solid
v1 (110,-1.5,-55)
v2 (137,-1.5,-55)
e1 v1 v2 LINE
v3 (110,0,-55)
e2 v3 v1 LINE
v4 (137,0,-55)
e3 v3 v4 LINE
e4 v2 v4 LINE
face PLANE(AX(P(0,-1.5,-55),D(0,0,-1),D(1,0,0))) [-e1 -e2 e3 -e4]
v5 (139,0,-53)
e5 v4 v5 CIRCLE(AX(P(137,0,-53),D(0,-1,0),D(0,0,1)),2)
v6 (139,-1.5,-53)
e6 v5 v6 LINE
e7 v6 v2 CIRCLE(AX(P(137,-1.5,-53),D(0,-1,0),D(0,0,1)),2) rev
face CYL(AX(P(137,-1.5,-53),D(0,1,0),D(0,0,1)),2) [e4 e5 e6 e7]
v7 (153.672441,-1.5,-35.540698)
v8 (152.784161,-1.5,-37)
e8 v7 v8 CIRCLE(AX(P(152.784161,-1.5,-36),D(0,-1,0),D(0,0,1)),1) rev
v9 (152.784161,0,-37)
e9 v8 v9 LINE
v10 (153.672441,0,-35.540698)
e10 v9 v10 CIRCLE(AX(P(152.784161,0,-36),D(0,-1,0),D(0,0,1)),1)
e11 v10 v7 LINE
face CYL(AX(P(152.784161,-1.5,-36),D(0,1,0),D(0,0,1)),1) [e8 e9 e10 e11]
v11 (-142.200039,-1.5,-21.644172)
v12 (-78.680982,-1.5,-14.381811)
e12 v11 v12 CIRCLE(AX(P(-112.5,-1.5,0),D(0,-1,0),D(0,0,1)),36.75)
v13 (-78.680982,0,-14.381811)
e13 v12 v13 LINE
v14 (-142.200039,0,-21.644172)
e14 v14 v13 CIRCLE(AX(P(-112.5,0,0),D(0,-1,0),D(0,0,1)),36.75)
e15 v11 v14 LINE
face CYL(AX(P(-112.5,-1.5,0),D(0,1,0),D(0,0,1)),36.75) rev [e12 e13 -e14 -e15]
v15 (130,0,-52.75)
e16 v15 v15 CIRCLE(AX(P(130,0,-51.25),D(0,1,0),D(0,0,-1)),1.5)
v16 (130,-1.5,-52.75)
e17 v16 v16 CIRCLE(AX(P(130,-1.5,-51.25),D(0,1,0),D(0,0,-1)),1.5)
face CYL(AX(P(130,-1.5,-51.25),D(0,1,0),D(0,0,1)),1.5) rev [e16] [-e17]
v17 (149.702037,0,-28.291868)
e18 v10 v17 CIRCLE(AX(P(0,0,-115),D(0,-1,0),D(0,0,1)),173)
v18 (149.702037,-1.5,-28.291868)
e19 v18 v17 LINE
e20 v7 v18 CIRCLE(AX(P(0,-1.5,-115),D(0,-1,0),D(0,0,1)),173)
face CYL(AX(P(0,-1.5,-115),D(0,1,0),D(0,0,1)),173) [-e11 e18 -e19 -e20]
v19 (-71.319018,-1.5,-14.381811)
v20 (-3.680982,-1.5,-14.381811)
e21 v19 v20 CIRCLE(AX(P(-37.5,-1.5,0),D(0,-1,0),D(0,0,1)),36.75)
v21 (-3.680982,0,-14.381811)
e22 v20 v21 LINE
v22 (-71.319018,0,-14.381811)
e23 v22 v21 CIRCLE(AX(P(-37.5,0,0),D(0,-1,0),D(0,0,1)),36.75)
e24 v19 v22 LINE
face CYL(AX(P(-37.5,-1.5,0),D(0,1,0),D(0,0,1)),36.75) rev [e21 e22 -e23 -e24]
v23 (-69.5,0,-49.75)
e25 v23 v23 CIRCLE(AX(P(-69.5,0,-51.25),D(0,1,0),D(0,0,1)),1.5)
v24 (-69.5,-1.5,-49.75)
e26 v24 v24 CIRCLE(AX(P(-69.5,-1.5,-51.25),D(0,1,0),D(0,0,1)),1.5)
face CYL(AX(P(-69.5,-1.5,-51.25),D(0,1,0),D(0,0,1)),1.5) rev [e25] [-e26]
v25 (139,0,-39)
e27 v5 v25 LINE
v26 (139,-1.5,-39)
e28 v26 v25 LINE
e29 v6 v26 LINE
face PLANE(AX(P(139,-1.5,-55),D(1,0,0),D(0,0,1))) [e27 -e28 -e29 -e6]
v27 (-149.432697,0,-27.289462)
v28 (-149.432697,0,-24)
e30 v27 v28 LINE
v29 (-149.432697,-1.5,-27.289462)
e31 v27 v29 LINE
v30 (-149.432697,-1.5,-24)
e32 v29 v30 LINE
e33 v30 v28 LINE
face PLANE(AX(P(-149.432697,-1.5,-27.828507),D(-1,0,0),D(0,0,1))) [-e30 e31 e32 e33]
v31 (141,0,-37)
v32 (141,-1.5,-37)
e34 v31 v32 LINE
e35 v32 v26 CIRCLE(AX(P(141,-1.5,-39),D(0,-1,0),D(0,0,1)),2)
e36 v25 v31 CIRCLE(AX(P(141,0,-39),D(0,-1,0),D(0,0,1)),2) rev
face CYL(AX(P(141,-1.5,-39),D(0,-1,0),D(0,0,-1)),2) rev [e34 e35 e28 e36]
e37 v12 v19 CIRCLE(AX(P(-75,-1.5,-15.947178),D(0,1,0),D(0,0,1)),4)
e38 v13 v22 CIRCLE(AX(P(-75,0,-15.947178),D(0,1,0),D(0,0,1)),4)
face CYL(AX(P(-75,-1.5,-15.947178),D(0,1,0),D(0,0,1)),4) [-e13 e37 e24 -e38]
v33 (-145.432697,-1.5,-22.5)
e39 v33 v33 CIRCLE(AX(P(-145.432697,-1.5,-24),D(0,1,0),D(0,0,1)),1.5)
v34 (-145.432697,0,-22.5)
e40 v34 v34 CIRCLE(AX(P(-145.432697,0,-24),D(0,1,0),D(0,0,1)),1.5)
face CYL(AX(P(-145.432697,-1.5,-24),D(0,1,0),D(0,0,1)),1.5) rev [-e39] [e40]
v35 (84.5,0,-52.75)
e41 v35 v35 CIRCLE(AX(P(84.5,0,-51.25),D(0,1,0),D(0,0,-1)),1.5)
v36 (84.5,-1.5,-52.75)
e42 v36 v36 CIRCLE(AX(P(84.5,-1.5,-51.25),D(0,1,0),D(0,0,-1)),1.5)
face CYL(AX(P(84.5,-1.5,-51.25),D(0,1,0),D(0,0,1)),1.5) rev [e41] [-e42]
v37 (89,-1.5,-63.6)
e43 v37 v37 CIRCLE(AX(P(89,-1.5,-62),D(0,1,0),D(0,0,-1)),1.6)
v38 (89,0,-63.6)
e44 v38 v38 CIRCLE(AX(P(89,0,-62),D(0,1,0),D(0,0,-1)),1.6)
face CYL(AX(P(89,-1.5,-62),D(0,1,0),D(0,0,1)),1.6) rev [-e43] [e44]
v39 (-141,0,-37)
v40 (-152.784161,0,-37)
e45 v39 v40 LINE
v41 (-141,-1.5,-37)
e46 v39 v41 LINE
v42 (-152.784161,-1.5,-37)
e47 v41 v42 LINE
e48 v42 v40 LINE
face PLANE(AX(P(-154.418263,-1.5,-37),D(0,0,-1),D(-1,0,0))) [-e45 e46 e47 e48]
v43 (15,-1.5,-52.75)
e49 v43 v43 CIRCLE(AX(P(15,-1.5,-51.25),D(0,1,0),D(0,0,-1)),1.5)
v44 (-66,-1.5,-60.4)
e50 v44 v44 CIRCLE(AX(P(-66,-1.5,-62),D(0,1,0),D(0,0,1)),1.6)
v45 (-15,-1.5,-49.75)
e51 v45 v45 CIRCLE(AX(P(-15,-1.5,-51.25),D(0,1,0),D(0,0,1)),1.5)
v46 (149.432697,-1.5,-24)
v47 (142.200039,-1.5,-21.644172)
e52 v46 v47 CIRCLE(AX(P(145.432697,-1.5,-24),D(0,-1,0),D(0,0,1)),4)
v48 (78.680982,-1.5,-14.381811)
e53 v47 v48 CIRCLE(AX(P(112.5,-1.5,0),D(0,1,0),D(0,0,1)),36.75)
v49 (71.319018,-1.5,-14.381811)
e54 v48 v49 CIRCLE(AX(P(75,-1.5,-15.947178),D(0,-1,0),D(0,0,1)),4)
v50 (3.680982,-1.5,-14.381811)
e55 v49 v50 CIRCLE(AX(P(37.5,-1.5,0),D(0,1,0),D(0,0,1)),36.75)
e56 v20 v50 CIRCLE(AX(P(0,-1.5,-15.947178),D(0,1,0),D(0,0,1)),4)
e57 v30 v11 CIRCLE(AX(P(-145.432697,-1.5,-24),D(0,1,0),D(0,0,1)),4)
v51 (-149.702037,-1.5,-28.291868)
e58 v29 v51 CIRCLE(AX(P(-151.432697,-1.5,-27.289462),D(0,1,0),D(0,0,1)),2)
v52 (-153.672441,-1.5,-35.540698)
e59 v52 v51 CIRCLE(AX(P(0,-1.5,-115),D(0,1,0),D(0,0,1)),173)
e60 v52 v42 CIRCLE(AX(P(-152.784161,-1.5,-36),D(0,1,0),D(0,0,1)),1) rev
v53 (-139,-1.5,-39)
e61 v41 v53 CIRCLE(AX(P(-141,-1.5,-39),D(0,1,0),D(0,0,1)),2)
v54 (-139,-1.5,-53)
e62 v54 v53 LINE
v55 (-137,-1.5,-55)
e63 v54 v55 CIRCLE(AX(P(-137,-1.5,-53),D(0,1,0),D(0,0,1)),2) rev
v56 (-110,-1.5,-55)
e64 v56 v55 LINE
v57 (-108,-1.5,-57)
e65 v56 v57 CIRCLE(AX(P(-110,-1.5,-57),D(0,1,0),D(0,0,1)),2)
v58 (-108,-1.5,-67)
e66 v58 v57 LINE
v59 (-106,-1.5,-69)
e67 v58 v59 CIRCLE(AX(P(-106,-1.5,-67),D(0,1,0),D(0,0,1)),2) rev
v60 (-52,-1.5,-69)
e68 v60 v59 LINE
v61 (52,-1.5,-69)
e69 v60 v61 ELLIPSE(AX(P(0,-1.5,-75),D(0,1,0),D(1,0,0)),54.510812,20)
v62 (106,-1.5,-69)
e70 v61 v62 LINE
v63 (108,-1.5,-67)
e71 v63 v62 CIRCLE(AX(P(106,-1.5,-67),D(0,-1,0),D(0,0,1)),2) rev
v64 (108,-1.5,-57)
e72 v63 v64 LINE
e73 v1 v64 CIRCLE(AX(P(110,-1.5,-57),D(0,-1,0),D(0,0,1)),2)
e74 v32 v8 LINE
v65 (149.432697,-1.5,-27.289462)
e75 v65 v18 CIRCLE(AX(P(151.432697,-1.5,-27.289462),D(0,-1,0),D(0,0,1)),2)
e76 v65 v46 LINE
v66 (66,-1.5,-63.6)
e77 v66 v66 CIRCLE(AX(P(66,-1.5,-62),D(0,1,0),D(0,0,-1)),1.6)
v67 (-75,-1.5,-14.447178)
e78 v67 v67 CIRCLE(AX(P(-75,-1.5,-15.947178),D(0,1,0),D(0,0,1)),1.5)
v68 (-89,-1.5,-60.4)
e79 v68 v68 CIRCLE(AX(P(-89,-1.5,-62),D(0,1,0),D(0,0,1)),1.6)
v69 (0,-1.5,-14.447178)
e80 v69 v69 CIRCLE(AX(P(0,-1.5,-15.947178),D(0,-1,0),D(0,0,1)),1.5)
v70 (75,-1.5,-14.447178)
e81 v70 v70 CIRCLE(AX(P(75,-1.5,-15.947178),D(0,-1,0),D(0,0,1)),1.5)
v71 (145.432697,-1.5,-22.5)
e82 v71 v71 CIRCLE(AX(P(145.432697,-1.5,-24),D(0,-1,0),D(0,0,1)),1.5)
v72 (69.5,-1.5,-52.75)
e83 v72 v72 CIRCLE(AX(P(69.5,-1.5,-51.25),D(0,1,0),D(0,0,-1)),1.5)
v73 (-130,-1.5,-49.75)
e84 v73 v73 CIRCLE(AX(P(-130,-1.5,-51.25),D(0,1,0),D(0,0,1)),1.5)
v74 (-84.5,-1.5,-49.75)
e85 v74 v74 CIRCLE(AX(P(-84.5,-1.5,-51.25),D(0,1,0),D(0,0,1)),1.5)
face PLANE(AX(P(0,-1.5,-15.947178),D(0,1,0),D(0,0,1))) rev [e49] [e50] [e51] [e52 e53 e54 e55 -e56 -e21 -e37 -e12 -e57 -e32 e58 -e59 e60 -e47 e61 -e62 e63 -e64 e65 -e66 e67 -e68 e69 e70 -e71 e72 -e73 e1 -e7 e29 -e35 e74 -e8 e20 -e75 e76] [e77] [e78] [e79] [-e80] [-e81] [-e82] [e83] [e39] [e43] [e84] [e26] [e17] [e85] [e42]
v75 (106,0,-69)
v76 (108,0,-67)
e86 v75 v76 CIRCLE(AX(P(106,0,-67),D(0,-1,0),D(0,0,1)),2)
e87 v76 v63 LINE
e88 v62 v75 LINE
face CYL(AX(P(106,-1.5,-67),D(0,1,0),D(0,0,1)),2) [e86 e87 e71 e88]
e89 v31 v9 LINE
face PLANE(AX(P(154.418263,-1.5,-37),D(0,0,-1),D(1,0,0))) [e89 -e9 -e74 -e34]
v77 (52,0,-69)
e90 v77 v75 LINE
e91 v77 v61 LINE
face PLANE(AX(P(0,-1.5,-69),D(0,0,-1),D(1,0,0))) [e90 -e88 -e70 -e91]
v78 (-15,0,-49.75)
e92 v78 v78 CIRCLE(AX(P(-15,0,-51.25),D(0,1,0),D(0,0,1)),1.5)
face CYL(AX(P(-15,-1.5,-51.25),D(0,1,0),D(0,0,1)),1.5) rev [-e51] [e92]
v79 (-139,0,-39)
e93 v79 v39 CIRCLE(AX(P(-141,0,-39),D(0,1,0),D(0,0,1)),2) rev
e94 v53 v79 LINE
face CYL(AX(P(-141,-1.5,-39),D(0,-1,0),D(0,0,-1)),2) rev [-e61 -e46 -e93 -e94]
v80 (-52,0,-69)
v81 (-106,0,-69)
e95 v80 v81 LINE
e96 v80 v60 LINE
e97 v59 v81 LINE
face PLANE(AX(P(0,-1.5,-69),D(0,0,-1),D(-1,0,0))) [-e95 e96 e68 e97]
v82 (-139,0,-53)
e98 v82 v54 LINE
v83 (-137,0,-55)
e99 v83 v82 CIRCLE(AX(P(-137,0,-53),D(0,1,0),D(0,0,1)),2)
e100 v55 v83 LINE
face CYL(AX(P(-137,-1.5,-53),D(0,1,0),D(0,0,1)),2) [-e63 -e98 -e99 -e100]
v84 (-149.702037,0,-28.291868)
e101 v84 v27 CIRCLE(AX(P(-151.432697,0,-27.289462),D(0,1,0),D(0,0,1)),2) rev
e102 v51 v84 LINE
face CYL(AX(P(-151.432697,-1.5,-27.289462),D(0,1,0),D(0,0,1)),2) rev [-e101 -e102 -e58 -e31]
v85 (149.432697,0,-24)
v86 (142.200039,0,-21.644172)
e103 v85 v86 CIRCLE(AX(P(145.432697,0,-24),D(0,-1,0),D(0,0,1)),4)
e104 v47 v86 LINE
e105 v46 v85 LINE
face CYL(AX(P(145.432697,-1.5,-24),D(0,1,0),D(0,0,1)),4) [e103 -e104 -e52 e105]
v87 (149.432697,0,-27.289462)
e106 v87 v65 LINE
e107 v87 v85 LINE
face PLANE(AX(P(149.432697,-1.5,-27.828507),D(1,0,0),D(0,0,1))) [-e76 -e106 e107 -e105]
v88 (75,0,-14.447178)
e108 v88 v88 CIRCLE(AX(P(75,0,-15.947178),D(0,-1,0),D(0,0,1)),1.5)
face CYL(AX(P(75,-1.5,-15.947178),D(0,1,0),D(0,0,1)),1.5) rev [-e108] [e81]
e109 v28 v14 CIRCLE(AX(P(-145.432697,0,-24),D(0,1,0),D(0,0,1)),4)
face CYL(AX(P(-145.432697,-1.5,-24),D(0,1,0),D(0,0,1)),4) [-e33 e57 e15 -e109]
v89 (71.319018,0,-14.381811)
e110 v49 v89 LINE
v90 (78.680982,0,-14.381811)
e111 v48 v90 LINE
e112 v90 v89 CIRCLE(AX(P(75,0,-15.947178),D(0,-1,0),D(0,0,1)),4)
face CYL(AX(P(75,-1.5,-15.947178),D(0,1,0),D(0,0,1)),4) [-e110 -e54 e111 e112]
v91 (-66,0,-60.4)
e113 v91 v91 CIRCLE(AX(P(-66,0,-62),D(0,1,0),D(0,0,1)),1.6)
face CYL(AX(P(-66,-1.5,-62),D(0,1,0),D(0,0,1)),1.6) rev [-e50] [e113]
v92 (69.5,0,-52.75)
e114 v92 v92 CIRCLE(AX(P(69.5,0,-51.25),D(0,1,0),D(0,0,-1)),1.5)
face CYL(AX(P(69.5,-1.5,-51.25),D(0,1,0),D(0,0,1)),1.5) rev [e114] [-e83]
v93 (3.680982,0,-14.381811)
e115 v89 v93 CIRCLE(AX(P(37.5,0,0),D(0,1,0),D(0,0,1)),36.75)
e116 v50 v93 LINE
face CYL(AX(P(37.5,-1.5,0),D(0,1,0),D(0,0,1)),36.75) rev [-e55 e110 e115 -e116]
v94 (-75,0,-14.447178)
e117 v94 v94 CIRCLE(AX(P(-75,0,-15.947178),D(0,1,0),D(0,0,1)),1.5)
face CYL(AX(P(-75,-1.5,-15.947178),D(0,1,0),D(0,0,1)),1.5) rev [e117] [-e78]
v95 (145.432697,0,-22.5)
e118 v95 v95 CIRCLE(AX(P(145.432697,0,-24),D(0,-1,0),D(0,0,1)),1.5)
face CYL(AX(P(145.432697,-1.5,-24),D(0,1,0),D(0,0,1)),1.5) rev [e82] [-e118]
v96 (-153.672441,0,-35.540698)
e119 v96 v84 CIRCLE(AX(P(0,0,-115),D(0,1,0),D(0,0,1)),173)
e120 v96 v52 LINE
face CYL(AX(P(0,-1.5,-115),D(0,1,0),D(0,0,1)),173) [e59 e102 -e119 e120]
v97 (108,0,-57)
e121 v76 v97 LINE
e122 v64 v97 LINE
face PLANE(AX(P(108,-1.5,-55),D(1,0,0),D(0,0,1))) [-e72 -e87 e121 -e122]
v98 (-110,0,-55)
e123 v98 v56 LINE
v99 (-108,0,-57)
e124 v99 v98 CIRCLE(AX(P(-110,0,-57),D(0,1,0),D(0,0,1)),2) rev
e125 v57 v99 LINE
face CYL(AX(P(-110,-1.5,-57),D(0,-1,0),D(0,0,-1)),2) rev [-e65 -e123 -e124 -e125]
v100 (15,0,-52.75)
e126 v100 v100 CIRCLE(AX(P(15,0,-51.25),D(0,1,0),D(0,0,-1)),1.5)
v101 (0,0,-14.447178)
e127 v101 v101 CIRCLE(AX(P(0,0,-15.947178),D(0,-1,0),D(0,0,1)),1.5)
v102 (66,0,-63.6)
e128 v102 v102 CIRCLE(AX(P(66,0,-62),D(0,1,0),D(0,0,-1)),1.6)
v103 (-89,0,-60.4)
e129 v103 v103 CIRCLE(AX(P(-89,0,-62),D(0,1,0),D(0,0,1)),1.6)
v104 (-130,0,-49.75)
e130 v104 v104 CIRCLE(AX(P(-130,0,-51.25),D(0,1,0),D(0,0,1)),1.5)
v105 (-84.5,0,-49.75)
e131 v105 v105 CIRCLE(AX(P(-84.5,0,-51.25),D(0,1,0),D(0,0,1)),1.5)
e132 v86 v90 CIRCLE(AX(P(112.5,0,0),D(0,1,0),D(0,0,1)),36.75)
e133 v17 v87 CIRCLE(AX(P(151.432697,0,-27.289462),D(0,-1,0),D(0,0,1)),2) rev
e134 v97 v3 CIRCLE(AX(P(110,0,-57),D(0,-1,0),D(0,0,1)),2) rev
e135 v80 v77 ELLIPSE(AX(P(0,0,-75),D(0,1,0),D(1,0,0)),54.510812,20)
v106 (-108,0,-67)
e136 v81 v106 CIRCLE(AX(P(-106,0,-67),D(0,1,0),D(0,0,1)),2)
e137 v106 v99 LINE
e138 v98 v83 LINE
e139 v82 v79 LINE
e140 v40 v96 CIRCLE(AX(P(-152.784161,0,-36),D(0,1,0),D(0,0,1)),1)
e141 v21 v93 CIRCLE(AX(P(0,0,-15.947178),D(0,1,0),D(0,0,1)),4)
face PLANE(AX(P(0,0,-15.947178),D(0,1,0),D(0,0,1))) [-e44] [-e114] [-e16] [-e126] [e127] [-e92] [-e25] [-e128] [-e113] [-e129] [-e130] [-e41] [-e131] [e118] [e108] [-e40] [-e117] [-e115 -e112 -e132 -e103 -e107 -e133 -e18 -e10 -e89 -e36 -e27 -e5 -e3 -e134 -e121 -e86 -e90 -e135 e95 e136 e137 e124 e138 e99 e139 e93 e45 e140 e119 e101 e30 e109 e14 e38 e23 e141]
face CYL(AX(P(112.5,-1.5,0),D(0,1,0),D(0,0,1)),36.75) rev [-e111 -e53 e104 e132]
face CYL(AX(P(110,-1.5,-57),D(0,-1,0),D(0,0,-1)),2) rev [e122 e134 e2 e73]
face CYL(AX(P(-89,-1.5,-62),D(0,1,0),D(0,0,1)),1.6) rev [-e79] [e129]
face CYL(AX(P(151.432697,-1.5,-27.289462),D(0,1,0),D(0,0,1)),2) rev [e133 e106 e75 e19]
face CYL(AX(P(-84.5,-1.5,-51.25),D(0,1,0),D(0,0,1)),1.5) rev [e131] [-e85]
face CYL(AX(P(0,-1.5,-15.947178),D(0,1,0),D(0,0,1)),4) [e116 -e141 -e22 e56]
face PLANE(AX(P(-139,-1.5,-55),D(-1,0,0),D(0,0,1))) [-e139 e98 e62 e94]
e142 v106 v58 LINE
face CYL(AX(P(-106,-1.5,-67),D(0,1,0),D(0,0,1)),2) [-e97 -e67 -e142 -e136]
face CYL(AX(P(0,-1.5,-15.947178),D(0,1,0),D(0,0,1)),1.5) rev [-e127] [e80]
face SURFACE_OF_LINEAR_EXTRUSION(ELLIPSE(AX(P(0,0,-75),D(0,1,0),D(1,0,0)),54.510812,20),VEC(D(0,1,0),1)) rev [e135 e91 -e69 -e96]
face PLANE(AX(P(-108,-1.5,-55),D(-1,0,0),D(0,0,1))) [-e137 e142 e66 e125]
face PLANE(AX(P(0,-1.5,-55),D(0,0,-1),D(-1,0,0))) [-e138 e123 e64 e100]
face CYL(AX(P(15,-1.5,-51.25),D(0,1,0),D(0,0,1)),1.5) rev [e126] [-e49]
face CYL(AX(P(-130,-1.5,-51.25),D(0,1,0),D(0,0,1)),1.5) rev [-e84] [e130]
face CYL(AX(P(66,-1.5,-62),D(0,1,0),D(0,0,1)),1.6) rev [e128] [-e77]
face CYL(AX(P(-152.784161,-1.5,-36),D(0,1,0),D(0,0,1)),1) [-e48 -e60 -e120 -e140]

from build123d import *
from build123d.topology import SkipClean

# Parameters (mm, degrees)
ESQUISSE1_R               = 1.5
T_LE_DE_BASE_PLI_E1_DEPTH = 1.5
CONG_1_R                  = 2
CONG_2_R                  = 1
ESQUISSE2_W               = 108
ESQUISSE2_H               = 14
PATTE1_DEPTH              = 1.5
CONG_3_R                  = 2
ENL_V_MAT_EXTRU_1_DEPTH   = 1.5
ESQUISSE6_R               = 1.5
ENL_V_MAT_EXTRU_2_DEPTH   = 1.5
ESQUISSE7_R               = 1.6
ENL_V_MAT_EXTRU_3_DEPTH   = 1.5


# Sheet-metal steps are written as plain solids
with BuildPart() as part:
    # Esquisse1 → Tôle de base pliée1 (new body)
    with BuildSketch(Plane(origin=(0, 0, 0), x_dir=(1, 0, 0), z_dir=(0, 1, 0))):
        with BuildLine():
            Line((0, 14.447178434), (0, 11.947178434))
            ThreePointArc((0, 11.947178434), (-2.206641245, 12.610902903), (-3.680981595, 14.381811226))
            ThreePointArc((-3.680981595, 14.381811226), (-37.5, 36.75), (-71.319018405, 14.381811226))
            ThreePointArc((-71.319018405, 14.381811226), (-75, 11.947178434), (-78.680981595, 14.381811226))
            ThreePointArc((-78.680981595, 14.381811226), (-108.32543803, 36.512128565), (-142.200039192, 21.644171779))
            ThreePointArc((-142.200039192, 21.644171779), (-146.671520698, 20.196670583), (-149.432696519, 24))
            Line((-149.432696519, 24), (-149.432696519, 27.828506889))
            ThreePointArc((-149.432696519, 27.828506889), (-151.994672595, 32.376640695), (-154.418263169, 37))
            Line((-154.418263169, 37), (-139, 37))
            Line((-139, 37), (-139, 55))
            Line((-139, 55), (0, 55))
            Line((0, 55), (0, 17.447178434))
            ThreePointArc((0, 17.447178434), (-1.5, 15.947178434), (0, 14.447178434))
        make_face()
        with Locations(Location((-145.432696519, 24, 0), (0, 0, 270))):
            Circle(ESQUISSE1_R, mode=Mode.SUBTRACT)
        with Locations(Location((-75, 15.947178434, 0), (0, 0, 270))):
            Circle(ESQUISSE1_R, mode=Mode.SUBTRACT)
    extrude(amount=-T_LE_DE_BASE_PLI_E1_DEPTH)

    # Congé1
    cong_1_edges = [part.edges().sort_by_distance(p)[0] for p in [
        (-149.432696519, -0.75, -27.828506889),
        (-139, -0.75, -37),
        (-139, -0.75, -55),
    ]]
    fillet(cong_1_edges, radius=CONG_1_R)

    # Congé2
    cong_2_edges = [part.edges().sort_by_distance(p)[0] for p in [
        (-154.418263169, -0.75, -37),
    ]]
    fillet(cong_2_edges, radius=CONG_2_R)

    # Esquisse2 → Patte1 (add)
    with BuildSketch(Plane(origin=(0, 0, 0), x_dir=(1, 0, 0), z_dir=(0, 1, 0))):
        with Locations((-54, 62)):
            Rectangle(ESQUISSE2_W, ESQUISSE2_H)
    extrude(amount=-PATTE1_DEPTH)

    # Congé3
    cong_3_edges = [part.edges().sort_by_distance(p)[0] for p in [
        (-108, -0.75, -55),
        (-108, -0.75, -69),
    ]]
    fillet(cong_3_edges, radius=CONG_3_R)

    # Esquisse5 → Enlèv. mat.-Extru.1 (cut)
    with BuildSketch(Plane(origin=(0, 0, 0), x_dir=(1, 0, 0), z_dir=(0, 1, 0))):
        with BuildLine():
            Line((0, 69), (-52, 69))
            add(Edge.make_bspline(
                [(-52, 69), (-40, 55), (0, 55)],
                knots=[3.446285308, 3.446285308, 3.446285308, 4.71238898, 4.71238898, 4.71238898], degree=2, weights=[1, 0.806225775, 1]))
            Line((0, 55), (0, 69))
        make_face()
    extrude(amount=-ENL_V_MAT_EXTRU_1_DEPTH, mode=Mode.SUBTRACT)

    # Symétrie1: part across face


with BuildPart() as part_1:
    with SkipClean():  # the faces are left unmerged after this step: merging them gives an invalid solid
        add(part.part)
        add(part.part.mirror(Plane(origin=(0, -0.75, -36.223589217), x_dir=(0, 0, 1), z_dir=(1, 0, 0))))

    # Esquisse6 → Enlèv. mat.-Extru.2 (cut)
    with SkipClean():  # the faces are left unmerged after this step: merging them gives an invalid solid
        with BuildSketch(Plane(origin=(0, 0, 0), x_dir=(1, 0, 0), z_dir=(0, 1, 0))):
            with Locations(Location((-84.5, 51.25, 0), (0, 0, 270))):
                Circle(ESQUISSE6_R)
            with Locations(Location((-69.5, 51.25, 0), (0, 0, 270))):
                Circle(ESQUISSE6_R)
            with Locations(Location((84.5, 51.25, 0), (0, 0, 90))):
                Circle(ESQUISSE6_R)
            with Locations(Location((69.5, 51.25, 0), (0, 0, 90))):
                Circle(ESQUISSE6_R)
            with Locations(Location((-130, 51.25, 0), (0, 0, 270))):
                Circle(ESQUISSE6_R)
            with Locations(Location((130, 51.25, 0), (0, 0, 90))):
                Circle(ESQUISSE6_R)
            with Locations(Location((-15, 51.25, 0), (0, 0, 270))):
                Circle(ESQUISSE6_R)
            with Locations(Location((15, 51.25, 0), (0, 0, 90))):
                Circle(ESQUISSE6_R)
        extrude(amount=-ENL_V_MAT_EXTRU_2_DEPTH, mode=Mode.SUBTRACT)

    # Esquisse7 → Enlèv. mat.-Extru.3 (cut)
    with SkipClean():  # the faces are left unmerged after this step: merging them gives an invalid solid
        with BuildSketch(Plane(origin=(0, 0, 0), x_dir=(1, 0, 0), z_dir=(0, 1, 0))):
            with Locations(Location((-89, 62, 0), (0, 0, 270))):
                Circle(ESQUISSE7_R)
            with Locations(Location((-66, 62, 0), (0, 0, 270))):
                Circle(ESQUISSE7_R)
            with Locations(Location((89, 62, 0), (0, 0, 90))):
                Circle(ESQUISSE7_R)
            with Locations(Location((66, 62, 0), (0, 0, 90))):
                Circle(ESQUISSE7_R)
        extrude(amount=-ENL_V_MAT_EXTRU_3_DEPTH, mode=Mode.SUBTRACT)


solid = part_1.part
